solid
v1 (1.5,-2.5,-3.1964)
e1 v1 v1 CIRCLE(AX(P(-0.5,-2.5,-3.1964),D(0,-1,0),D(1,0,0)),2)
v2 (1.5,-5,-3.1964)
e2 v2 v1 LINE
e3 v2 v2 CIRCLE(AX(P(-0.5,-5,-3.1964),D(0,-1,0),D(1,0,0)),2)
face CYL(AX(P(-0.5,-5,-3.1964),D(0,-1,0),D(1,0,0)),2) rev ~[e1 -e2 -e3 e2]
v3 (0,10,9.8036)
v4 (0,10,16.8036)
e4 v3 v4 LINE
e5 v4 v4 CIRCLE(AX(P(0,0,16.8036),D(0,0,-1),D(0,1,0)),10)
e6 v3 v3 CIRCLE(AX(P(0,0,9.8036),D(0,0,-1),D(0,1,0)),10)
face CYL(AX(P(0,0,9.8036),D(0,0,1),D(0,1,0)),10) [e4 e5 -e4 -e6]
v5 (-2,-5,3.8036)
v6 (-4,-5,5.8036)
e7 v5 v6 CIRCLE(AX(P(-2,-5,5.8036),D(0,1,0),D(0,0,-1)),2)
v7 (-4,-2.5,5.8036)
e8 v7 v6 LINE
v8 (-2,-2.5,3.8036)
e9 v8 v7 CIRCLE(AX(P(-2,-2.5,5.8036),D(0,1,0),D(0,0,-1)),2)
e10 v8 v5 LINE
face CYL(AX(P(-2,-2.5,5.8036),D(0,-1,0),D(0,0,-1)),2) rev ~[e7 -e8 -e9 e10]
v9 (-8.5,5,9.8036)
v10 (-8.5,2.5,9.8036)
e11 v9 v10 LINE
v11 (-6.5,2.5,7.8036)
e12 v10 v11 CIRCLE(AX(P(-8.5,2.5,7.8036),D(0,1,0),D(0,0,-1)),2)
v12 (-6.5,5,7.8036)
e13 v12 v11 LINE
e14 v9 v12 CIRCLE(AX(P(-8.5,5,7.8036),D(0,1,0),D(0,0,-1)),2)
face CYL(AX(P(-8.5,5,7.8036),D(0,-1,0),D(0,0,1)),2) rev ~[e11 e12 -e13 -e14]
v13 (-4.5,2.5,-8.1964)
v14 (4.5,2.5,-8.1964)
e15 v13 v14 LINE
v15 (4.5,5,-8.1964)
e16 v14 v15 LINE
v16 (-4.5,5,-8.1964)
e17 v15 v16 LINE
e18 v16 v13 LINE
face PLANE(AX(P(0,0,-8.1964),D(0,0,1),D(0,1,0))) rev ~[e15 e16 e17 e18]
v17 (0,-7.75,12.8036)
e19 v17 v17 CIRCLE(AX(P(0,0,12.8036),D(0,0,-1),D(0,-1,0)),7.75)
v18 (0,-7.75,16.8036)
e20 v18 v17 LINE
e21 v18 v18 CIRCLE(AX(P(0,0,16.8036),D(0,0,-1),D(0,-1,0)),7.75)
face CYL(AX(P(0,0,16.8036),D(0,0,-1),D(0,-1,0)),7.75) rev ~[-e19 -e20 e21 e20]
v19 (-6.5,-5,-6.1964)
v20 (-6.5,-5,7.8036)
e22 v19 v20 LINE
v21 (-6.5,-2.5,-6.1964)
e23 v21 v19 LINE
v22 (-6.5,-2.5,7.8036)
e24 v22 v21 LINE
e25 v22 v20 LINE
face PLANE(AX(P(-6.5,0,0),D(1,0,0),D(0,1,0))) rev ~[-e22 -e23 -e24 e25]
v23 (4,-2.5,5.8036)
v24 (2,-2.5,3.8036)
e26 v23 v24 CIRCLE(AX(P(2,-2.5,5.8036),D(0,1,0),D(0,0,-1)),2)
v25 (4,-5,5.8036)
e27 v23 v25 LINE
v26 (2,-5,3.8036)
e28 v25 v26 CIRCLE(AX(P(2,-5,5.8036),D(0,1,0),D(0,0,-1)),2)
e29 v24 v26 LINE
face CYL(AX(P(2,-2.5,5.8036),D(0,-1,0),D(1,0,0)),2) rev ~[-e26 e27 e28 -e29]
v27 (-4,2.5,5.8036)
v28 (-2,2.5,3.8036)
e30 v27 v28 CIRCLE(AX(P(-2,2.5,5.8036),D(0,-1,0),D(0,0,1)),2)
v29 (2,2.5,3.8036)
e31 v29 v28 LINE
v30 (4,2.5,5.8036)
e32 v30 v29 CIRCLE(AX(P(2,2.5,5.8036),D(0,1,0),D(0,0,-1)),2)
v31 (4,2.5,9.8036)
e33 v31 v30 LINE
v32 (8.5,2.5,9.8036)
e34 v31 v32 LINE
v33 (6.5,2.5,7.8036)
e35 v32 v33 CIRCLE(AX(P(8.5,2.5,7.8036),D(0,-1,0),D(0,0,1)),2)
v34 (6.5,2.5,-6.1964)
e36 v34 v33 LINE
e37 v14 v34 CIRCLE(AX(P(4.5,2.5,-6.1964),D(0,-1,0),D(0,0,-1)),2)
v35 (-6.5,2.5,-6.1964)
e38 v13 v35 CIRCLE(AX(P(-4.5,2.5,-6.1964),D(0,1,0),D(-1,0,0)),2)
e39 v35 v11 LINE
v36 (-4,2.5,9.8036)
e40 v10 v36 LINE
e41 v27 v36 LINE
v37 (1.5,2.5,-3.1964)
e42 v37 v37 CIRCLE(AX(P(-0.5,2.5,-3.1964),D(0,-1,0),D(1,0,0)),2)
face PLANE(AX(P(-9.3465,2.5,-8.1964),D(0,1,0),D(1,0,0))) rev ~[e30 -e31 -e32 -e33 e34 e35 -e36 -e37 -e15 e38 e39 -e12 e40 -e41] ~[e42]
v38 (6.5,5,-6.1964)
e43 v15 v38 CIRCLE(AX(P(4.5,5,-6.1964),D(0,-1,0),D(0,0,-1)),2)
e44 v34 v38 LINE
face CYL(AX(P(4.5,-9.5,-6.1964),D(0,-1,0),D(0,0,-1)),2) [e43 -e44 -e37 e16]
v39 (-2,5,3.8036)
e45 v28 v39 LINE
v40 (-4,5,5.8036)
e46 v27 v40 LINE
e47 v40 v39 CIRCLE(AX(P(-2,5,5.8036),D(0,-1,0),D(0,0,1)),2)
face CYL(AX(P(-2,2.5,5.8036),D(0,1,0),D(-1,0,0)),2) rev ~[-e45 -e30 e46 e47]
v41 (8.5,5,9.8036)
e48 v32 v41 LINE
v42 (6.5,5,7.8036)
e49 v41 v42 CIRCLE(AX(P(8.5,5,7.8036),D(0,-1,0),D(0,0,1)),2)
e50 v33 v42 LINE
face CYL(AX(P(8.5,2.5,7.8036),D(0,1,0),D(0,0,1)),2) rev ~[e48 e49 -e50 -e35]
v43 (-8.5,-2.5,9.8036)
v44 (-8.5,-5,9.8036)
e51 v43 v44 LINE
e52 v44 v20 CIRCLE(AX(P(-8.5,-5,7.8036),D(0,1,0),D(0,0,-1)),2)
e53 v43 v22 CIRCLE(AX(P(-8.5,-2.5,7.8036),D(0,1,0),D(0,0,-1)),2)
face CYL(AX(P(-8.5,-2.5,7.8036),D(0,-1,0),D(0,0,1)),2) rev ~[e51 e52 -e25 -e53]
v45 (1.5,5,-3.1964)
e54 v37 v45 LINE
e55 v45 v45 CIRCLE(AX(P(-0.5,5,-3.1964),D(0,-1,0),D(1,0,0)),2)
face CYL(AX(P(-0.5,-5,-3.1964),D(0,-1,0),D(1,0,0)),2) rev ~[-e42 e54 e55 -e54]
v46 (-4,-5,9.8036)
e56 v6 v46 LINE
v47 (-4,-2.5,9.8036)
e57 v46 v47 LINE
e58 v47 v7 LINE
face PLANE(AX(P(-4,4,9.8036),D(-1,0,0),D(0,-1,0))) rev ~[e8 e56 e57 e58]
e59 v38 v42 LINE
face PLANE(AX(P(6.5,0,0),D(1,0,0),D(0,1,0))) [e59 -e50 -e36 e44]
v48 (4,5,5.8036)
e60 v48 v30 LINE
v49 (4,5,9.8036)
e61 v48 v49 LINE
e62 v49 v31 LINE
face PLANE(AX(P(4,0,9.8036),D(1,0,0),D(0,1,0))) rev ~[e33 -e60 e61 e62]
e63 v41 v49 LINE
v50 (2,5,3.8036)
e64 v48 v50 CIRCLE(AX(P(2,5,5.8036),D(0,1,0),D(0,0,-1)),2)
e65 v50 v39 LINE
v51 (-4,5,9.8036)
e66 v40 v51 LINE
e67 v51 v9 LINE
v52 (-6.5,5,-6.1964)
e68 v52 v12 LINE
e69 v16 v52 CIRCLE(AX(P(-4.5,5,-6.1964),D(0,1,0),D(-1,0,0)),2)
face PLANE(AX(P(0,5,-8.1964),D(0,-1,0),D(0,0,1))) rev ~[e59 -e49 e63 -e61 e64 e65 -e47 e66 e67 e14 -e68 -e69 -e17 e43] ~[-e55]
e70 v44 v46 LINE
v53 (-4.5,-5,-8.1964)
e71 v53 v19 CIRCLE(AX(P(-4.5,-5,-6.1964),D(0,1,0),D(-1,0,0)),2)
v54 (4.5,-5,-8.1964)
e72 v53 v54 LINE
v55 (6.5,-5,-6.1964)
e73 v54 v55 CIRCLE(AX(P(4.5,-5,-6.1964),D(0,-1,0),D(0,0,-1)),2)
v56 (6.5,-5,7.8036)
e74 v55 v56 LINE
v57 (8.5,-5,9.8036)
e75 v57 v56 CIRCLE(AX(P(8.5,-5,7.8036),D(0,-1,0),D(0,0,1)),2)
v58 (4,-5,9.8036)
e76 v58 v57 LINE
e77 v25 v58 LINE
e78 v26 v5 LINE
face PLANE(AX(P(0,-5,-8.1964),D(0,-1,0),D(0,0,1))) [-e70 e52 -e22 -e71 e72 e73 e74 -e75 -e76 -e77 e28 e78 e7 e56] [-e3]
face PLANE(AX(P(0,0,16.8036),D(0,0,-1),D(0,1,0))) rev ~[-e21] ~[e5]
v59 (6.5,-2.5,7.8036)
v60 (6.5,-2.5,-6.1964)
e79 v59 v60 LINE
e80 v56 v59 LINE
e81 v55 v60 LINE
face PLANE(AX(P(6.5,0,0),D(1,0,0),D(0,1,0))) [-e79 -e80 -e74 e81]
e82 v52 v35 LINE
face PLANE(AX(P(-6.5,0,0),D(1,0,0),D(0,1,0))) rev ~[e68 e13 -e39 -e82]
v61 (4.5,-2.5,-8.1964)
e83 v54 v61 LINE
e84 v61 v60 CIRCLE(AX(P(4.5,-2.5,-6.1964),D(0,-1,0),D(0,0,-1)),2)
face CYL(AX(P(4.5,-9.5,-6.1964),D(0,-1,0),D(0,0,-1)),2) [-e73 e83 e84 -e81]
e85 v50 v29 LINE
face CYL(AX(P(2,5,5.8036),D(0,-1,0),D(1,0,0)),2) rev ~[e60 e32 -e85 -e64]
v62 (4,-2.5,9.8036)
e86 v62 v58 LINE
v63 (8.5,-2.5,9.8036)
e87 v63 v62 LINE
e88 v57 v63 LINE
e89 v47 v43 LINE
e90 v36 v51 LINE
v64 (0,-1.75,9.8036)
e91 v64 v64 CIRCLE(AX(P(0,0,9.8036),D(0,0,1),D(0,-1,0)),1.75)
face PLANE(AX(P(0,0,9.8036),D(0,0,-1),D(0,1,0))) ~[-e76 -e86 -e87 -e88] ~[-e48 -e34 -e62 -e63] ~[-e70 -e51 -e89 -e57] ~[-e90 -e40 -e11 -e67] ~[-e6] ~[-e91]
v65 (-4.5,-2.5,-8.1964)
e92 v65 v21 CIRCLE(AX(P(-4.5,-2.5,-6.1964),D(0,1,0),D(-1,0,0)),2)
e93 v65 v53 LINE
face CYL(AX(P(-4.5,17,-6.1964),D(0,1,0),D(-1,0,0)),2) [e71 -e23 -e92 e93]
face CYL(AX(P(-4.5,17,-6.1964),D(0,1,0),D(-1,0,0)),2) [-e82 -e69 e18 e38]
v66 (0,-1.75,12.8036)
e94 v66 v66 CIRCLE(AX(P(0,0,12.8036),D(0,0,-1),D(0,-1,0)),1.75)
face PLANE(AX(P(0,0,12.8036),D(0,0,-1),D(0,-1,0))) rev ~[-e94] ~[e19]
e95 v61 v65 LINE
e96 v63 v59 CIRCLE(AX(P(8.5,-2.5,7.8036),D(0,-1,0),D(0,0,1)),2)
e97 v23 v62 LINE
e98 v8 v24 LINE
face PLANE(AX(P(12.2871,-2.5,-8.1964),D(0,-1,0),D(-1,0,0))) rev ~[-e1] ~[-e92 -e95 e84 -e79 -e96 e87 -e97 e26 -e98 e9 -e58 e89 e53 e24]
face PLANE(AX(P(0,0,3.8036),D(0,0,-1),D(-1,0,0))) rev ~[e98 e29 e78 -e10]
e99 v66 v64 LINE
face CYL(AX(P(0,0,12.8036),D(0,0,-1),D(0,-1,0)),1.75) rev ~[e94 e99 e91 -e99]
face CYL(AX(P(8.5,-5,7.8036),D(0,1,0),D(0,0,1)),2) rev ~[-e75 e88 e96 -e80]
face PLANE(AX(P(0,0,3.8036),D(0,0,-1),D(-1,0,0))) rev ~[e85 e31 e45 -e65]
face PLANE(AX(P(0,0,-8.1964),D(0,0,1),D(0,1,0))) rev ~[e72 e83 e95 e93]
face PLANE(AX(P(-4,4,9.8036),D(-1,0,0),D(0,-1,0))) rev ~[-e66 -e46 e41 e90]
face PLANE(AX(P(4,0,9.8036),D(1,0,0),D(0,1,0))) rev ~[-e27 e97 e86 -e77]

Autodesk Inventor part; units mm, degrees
ref_plane "YZ Plane" through (0, 0, 0) normal (1, 0, 0) x (0, 1, 0)
ref_plane "XZ Plane" through (0, 0, 0) normal (0, 1, 0) x (-1, 0, 0)
sketch "Sketch1" plane through (0, 0, 0) normal (1, 0, 0) x (0, 1, 0)
  line L0 (0, 21.5591) -> (0, -21.8295)
  line L1 (10, 16.8036) -> (0, 16.8036)
  line L2 (0, 16.8036) -> (0, 9.8036)
  line L3 (0, 9.8036) -> (10, 9.8036)
  line L4 (10, 9.8036) -> (10, 16.8036)
  line L5 (5, 9.8036) -> (0, 9.8036)
  line L6 (0, 9.8036) -> (0, -8.1964)
  line L7 (0, -8.1964) -> (5, -8.1964)
  line L8 (5, -8.1964) -> (5, 9.8036)
  line L9 (-5, 9.8036) -> (0, 9.8036)
  line L10 (0, -8.1964) -> (-5, -8.1964)
  line L11 (-5, -8.1964) -> (-5, 9.8036)
  point P0 (0, 0)
  dimension "d0" = 20
  dimension "d1" = 7
  dimension "d5" = 10
  dimension "d7" = 25
revolve "Revolution1" add sketch "Sketch1" angle 360 about axis through (0, 0, 21.5591) along (0, 0, -1) contours L1 L4 L3 L0
extrude "Extrusion1" add sketch "Sketch1" along normal mid plane 13 contours L3 L8 L7 L0 | L0 L10 L11 L9
hole "Hole1" at (0, 0, 16.8036) direction (0, 0, -1) diameter 3.5 end through all counterbore diameter 15.5 counterbore depth 4
ref_plane "Work Plane1" through (0, 0, 9.8036) normal (0, 0, 1) x (1, 0, 0)
sketch "Sketch2" plane through (6.5, 5, -8.1964) normal (0, 0, -1) x (-1, 0, 0)
  circle A0 centre (6.5, -5) radius 1.75 projected
  line L0 (6.5, -5) -> (19.0307, -5)
  line L1 (15.8465, -2.5) -> (-5.7871, -2.5)
  line L2 (-5.7871, -2.5) -> (-5.7871, -7.5)
  line L3 (-5.7871, -7.5) -> (15.8465, -7.5)
  line L4 (15.8465, -7.5) -> (15.8465, -2.5)
  point P0 (6.5, -5)
  dimension "d20" = 5
extrude "Extrusion2" cut sketch "Sketch2" against normal up to surface (18 mm away)
sketch "Sketch3" plane through (0, 0, 9.8036) normal (0, 0, -1) x (-1, 0, 0)
  line L0 (-4, 4) -> (4, 4)
  line L1 (4, 4) -> (4, -4)
  line L2 (4, -4) -> (-4, -4)
  line L3 (-4, -4) -> (-4, 4)
  line L4 (0, 0) -> (0, 10) projected
  circle A0 centre (0, 0) radius 1.75 projected
  line L5 (0, 0) -> (-11.0224, 0)
  dimension "d33" = 8
extrude "Extrusion3" cut sketch "Sketch3" along normal blind 6 contours L0 L4 A0 L5 L3 | L0 L1 L2 L3 L5 A0 L4
sketch "Sketch4" plane through (-6.5, -5, -8.1964) normal (0, -1, 0) x (1, 0, 0)
  line L0 (0, 18) -> (13, 18) projected
  line L1 (0, 0) -> (0, 18) projected
  line L2 (0, 0) -> (13, 0) projected
  line L3 (13, 18) -> (13, 0) projected
  circle A0 centre (6, 5) radius 2
  point P0 (6.5, 8.1964)
  dimension "d26" = 5
  dimension "d27" = 4
extrude "Extrusion4" cut sketch "Sketch4" against normal through all contours A0
fillet "Fillet1" radius 2 2 edges at (6.5, -3.75, 9.8036) (6.5, 3.75, 9.8036)
fillet "Fillet1" radius 2 2 edges at (-6.5, -3.75, 9.8036) (-6.5, 3.75, 9.8036)
fillet "Fillet2" radius 2 2 edges at (6.5, 3.75, -8.1964) (-6.5, 3.75, -8.1964)
sketch "Sketch5" plane through (-4, 4, 9.8036) normal (0, -1, 0) x (1, 0, 0)
  line L0 (8, 0) -> (0, 0) projected
  line L1 (0, 0) -> (0, -6) projected
  line L2 (0, -6) -> (8, -6) projected
  line L3 (8, 0) -> (8, -6) projected
  point P0 (4, -9.8036)
extrude "Extrusion5" cut sketch "Sketch5" along normal through all both and the other way through all
fillet "Fillet3" radius 2 4 edges at (4, -3.75, 3.8036) (4, 3.75, 3.8036) (-4, 3.75, 3.8036) (-4, -3.75, 3.8036)
properties part number "piston"
